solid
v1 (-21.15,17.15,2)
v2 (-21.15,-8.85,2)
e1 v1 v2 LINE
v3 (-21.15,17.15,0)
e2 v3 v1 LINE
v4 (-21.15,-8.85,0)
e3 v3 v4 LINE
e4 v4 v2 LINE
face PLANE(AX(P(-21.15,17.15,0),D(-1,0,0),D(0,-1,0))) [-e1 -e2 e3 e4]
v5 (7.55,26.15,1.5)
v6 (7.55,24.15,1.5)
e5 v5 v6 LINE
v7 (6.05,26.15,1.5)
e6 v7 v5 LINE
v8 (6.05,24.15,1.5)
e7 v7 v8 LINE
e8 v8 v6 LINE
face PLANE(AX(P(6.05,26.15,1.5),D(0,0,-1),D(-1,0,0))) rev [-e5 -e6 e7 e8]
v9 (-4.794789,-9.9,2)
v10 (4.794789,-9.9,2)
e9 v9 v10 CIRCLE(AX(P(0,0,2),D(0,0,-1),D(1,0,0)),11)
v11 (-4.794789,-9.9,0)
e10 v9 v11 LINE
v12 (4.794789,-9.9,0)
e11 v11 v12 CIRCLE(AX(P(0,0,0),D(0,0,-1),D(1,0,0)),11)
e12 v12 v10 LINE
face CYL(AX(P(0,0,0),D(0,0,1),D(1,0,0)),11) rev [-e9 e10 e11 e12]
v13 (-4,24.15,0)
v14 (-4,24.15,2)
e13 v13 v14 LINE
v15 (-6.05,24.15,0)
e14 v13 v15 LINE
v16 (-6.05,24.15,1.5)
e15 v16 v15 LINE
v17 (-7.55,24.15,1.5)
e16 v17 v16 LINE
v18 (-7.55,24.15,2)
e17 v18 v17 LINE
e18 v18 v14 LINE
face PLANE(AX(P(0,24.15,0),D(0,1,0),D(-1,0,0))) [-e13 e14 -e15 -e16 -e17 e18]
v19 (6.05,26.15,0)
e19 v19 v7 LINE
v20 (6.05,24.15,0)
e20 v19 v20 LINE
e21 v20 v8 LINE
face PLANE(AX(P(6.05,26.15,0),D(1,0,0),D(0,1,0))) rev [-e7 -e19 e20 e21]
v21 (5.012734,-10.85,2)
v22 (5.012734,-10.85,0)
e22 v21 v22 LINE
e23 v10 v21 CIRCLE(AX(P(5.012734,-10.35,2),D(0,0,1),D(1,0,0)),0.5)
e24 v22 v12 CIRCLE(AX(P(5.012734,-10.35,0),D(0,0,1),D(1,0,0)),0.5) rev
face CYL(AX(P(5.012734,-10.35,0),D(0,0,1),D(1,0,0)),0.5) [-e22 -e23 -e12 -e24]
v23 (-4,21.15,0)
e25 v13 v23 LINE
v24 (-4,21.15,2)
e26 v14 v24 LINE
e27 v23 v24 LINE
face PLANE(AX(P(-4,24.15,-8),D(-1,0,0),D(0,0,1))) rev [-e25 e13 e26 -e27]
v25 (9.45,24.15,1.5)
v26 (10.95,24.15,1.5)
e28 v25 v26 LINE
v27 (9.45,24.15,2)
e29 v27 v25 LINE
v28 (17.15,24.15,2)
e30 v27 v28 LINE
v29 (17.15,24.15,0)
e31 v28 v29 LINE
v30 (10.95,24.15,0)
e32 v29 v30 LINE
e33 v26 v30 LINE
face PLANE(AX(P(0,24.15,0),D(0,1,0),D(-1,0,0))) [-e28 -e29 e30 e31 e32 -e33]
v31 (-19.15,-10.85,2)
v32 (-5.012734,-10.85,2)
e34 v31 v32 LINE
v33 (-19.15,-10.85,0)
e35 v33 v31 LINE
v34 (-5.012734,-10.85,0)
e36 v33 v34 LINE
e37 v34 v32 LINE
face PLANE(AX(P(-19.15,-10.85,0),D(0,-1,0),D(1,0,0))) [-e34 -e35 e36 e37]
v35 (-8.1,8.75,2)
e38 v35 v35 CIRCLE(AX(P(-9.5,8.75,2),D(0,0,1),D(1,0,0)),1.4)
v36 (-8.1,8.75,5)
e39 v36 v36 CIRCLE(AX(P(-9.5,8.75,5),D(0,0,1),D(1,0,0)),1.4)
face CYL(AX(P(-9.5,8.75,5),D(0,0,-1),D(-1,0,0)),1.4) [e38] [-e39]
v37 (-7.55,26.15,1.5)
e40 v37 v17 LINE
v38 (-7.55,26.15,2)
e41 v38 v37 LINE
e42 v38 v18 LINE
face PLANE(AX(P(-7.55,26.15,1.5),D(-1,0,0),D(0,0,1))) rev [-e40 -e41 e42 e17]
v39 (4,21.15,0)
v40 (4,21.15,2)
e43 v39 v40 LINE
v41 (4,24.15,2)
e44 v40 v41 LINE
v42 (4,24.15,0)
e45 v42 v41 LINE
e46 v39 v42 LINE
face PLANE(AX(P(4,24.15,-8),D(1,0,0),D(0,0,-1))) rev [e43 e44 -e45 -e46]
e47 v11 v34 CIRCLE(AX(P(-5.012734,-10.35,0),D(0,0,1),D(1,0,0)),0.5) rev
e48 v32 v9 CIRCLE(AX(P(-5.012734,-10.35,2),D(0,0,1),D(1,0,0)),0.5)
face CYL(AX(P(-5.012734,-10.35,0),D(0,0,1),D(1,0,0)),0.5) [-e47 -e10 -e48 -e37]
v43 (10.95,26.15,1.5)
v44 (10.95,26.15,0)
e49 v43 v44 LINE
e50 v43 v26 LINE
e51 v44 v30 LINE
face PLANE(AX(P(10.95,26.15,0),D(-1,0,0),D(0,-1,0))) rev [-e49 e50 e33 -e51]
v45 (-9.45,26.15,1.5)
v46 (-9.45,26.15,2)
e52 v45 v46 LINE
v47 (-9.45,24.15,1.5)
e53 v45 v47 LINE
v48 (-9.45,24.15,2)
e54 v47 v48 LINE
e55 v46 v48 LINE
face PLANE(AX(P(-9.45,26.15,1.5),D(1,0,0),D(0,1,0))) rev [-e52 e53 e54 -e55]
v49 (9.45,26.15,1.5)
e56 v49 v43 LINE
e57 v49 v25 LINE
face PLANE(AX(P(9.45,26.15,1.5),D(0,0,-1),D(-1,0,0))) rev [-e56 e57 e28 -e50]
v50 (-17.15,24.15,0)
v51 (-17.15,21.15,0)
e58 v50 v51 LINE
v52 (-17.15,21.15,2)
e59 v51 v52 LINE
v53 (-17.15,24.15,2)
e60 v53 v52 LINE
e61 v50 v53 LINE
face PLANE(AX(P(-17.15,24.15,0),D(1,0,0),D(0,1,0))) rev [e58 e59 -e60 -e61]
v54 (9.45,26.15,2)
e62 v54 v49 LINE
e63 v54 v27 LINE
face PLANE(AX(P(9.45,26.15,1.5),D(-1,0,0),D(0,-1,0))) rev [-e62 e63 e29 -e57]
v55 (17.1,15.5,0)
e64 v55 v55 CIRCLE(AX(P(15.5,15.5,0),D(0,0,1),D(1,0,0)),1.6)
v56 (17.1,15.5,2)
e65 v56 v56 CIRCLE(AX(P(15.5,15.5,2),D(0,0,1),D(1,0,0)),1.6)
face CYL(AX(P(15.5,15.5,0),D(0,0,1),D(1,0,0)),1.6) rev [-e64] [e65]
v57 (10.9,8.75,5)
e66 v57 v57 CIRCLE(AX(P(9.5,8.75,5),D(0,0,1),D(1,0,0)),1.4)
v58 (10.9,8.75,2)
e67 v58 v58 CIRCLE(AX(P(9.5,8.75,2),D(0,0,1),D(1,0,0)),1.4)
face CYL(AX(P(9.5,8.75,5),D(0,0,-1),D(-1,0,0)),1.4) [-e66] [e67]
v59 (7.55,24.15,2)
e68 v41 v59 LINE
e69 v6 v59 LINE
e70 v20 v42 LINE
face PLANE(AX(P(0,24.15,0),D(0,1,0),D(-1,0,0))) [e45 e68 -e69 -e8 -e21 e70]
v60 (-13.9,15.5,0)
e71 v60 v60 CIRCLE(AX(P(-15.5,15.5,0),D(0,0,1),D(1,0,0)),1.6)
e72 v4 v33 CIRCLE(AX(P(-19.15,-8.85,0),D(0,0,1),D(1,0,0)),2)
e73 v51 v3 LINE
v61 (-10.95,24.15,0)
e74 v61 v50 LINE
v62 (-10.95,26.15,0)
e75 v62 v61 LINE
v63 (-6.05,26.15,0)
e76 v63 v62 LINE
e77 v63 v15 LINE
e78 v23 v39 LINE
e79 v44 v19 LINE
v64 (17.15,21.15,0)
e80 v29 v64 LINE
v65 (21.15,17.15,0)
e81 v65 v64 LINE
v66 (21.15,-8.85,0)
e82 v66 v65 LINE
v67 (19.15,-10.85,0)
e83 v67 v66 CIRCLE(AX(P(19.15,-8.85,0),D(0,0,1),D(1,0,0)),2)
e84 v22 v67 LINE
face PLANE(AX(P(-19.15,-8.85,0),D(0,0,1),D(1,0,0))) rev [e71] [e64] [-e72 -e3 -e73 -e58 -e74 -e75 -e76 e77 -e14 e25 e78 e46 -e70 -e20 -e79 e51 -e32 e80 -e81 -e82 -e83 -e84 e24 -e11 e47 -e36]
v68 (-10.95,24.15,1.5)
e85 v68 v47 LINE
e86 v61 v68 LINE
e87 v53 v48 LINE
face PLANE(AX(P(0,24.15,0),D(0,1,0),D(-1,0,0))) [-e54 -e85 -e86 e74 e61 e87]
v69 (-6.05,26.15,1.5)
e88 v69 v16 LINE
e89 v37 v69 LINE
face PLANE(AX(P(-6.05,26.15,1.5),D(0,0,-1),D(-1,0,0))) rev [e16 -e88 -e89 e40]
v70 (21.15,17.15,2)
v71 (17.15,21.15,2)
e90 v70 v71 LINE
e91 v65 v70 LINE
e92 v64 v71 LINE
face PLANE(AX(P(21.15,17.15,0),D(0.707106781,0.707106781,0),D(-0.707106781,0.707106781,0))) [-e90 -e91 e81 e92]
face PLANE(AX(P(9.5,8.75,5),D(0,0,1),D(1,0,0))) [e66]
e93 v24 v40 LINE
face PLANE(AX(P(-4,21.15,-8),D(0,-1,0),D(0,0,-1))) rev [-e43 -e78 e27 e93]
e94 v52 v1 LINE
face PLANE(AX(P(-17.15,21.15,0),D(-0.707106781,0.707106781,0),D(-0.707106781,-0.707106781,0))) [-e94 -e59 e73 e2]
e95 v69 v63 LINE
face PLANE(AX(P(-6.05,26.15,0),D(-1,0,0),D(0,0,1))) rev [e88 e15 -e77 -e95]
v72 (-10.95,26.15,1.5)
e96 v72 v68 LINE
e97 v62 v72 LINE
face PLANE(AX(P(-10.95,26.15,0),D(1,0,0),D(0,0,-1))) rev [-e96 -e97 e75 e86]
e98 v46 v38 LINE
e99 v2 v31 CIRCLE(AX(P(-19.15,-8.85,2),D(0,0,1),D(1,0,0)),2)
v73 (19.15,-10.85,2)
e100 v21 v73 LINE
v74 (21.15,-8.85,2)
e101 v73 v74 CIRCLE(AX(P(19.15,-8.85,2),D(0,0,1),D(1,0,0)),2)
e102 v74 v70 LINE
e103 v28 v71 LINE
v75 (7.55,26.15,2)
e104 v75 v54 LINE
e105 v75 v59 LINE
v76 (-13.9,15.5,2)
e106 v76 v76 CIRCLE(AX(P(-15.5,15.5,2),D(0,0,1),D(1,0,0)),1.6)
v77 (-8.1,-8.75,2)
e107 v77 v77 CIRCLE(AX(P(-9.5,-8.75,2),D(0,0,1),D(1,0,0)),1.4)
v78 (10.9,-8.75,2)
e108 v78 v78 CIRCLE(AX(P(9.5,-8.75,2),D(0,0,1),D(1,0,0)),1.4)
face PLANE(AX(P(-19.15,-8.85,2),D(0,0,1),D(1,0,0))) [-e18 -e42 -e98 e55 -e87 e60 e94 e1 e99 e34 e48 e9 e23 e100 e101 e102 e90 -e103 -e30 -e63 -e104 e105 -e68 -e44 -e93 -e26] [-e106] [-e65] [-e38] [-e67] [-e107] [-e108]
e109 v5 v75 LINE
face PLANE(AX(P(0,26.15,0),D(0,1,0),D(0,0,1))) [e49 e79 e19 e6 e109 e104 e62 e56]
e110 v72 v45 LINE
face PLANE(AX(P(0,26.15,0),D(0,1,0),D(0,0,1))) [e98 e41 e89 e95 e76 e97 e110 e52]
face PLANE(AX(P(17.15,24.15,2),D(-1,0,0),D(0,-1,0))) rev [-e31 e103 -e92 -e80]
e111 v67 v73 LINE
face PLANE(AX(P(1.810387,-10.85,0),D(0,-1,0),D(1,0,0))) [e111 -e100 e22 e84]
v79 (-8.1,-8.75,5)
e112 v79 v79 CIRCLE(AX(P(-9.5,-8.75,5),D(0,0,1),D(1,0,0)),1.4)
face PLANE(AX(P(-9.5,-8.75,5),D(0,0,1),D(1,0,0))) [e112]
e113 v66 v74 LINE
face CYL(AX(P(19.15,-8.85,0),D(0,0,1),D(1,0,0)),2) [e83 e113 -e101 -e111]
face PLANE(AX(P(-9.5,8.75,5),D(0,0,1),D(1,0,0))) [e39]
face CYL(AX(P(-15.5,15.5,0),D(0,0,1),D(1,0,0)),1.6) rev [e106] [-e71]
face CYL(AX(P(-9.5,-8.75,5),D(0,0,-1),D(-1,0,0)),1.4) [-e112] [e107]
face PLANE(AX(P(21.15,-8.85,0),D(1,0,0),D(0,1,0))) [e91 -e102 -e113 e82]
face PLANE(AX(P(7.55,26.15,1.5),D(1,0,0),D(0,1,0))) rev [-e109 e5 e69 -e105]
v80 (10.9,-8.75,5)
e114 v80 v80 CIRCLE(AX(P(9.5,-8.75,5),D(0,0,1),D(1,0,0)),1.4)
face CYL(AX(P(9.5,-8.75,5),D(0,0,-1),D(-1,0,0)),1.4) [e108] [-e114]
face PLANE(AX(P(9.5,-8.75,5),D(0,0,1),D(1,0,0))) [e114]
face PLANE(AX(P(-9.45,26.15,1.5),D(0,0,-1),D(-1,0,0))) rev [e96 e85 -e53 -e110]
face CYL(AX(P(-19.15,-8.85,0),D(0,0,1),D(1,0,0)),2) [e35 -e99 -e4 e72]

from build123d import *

# Parameters (mm, degrees)
STOCK_DRIVEBLOCK_CNC_10MM_MASTER_1_OUTLI_R = 1.6
STOCK_DRIVEBLOCK_CNC_10MM_MASTER_1_DEPTH   = 2
STOCK_DRIVEBLOCK_CNC_10MM_MASTER_1_START   = 2
STOCK_DRIVEBLOCK_CNC_10MM_MASTER_1_2_OUT_R = 1.4
STOCK_DRIVEBLOCK_CNC_10MM_MASTER_1_2_DEPTH = 3
SKETCH1_W                                  = 34.3
SKETCH1_H                                  = 2
BOSS_EXTRUDE1_DEPTH                        = 3
BOSS_EXTRUDE2_DEPTH                        = 2
SKETCH3_W                                  = 8
SKETCH3_H                                  = 3
CUT_EXTRUDE1_DEPTH                         = 10


# Read off the part's stored shape, not the designer's step: Stock-driveblock-cnc-10mm-master-1
with BuildPart() as part:
    # Stock-driveblock-cnc-10mm-master-1 outli → Stock-driveblock-cnc-10mm-master-1 (new body)
    with BuildSketch(Plane.XY):
        with BuildLine():
            Line((21.15, -8.85), (21.15, 17.15))
            Line((21.15, 17.15), (17.15, 21.15))
            Line((17.15, 21.15), (-17.15, 21.15))
            Line((-17.15, 21.15), (-21.15, 17.15))
            Line((-21.15, 17.15), (-21.15, -8.85))
            ThreePointArc((-21.15, -8.85), (-20.564213562, -10.264213562), (-19.15, -10.85))
            Line((-19.15, -10.85), (-5.012733785, -10.85))
            ThreePointArc((-5.012733785, -10.85), (-4.525394068, -10.461803399), (-4.794788838, -9.9))
            ThreePointArc((-4.794788838, -9.9), (0, 11), (4.794788838, -9.9))
            ThreePointArc((4.794788838, -9.9), (4.525394068, -10.461803399), (5.012733785, -10.85))
            Line((5.012733785, -10.85), (19.15, -10.85))
            ThreePointArc((19.15, -10.85), (20.564213562, -10.264213562), (21.15, -8.85))
        make_face()
        with Locations((-15.5, 15.5)):
            Circle(STOCK_DRIVEBLOCK_CNC_10MM_MASTER_1_OUTLI_R, mode=Mode.SUBTRACT)
        with Locations((15.5, 15.5)):
            Circle(STOCK_DRIVEBLOCK_CNC_10MM_MASTER_1_OUTLI_R, mode=Mode.SUBTRACT)
    extrude(amount=STOCK_DRIVEBLOCK_CNC_10MM_MASTER_1_DEPTH)

    # Stock-driveblock-cnc-10mm-master-1 2 out → Stock-driveblock-cnc-10mm-master-1 2 (add)
    with BuildSketch(Plane.XY.offset(STOCK_DRIVEBLOCK_CNC_10MM_MASTER_1_START)):
        with Locations((-9.5, 8.75)):
            Circle(STOCK_DRIVEBLOCK_CNC_10MM_MASTER_1_2_OUT_R)
        with Locations((9.5, 8.75)):
            Circle(STOCK_DRIVEBLOCK_CNC_10MM_MASTER_1_2_OUT_R)
        with Locations((9.5, -8.75)):
            Circle(STOCK_DRIVEBLOCK_CNC_10MM_MASTER_1_2_OUT_R)
        with Locations((-9.5, -8.75)):
            Circle(STOCK_DRIVEBLOCK_CNC_10MM_MASTER_1_2_OUT_R)
    extrude(amount=STOCK_DRIVEBLOCK_CNC_10MM_MASTER_1_2_DEPTH)

    # Sketch1 → Boss-Extrude1 (add)
    with BuildSketch(Plane(origin=(0, 21.15, 0), x_dir=(1, 0, 0), z_dir=(0, 1, 0))):
        with Locations((0, -1)):
            Rectangle(SKETCH1_W, SKETCH1_H)
    extrude(amount=BOSS_EXTRUDE1_DEPTH)

    # Sketch2 → Boss-Extrude2 (add)
    with BuildSketch(Plane(origin=(0, 24.15, 0), x_dir=(1, 0, 0), z_dir=(0, 1, 0))):
        Polygon((9.45, -1.5), (10.95, -1.5), (10.95, 0), (6.05, 0), (6.05, -1.5), (7.55, -1.5), (7.55, -2), (9.45, -2), align=None)
        Polygon((-9.45, -1.5), (-9.45, -2), (-7.55, -2), (-7.55, -1.5), (-6.05, -1.5), (-6.05, 0), (-10.95, 0), (-10.95, -1.5), align=None)
    extrude(amount=BOSS_EXTRUDE2_DEPTH)

    # Sketch3 → Cut-Extrude1 (cut)
    with BuildSketch(Plane.XY.offset(2)):
        with Locations((0, 22.65)):
            Rectangle(SKETCH3_W, SKETCH3_H)
    extrude(amount=-CUT_EXTRUDE1_DEPTH, mode=Mode.SUBTRACT)


solid = part.part
